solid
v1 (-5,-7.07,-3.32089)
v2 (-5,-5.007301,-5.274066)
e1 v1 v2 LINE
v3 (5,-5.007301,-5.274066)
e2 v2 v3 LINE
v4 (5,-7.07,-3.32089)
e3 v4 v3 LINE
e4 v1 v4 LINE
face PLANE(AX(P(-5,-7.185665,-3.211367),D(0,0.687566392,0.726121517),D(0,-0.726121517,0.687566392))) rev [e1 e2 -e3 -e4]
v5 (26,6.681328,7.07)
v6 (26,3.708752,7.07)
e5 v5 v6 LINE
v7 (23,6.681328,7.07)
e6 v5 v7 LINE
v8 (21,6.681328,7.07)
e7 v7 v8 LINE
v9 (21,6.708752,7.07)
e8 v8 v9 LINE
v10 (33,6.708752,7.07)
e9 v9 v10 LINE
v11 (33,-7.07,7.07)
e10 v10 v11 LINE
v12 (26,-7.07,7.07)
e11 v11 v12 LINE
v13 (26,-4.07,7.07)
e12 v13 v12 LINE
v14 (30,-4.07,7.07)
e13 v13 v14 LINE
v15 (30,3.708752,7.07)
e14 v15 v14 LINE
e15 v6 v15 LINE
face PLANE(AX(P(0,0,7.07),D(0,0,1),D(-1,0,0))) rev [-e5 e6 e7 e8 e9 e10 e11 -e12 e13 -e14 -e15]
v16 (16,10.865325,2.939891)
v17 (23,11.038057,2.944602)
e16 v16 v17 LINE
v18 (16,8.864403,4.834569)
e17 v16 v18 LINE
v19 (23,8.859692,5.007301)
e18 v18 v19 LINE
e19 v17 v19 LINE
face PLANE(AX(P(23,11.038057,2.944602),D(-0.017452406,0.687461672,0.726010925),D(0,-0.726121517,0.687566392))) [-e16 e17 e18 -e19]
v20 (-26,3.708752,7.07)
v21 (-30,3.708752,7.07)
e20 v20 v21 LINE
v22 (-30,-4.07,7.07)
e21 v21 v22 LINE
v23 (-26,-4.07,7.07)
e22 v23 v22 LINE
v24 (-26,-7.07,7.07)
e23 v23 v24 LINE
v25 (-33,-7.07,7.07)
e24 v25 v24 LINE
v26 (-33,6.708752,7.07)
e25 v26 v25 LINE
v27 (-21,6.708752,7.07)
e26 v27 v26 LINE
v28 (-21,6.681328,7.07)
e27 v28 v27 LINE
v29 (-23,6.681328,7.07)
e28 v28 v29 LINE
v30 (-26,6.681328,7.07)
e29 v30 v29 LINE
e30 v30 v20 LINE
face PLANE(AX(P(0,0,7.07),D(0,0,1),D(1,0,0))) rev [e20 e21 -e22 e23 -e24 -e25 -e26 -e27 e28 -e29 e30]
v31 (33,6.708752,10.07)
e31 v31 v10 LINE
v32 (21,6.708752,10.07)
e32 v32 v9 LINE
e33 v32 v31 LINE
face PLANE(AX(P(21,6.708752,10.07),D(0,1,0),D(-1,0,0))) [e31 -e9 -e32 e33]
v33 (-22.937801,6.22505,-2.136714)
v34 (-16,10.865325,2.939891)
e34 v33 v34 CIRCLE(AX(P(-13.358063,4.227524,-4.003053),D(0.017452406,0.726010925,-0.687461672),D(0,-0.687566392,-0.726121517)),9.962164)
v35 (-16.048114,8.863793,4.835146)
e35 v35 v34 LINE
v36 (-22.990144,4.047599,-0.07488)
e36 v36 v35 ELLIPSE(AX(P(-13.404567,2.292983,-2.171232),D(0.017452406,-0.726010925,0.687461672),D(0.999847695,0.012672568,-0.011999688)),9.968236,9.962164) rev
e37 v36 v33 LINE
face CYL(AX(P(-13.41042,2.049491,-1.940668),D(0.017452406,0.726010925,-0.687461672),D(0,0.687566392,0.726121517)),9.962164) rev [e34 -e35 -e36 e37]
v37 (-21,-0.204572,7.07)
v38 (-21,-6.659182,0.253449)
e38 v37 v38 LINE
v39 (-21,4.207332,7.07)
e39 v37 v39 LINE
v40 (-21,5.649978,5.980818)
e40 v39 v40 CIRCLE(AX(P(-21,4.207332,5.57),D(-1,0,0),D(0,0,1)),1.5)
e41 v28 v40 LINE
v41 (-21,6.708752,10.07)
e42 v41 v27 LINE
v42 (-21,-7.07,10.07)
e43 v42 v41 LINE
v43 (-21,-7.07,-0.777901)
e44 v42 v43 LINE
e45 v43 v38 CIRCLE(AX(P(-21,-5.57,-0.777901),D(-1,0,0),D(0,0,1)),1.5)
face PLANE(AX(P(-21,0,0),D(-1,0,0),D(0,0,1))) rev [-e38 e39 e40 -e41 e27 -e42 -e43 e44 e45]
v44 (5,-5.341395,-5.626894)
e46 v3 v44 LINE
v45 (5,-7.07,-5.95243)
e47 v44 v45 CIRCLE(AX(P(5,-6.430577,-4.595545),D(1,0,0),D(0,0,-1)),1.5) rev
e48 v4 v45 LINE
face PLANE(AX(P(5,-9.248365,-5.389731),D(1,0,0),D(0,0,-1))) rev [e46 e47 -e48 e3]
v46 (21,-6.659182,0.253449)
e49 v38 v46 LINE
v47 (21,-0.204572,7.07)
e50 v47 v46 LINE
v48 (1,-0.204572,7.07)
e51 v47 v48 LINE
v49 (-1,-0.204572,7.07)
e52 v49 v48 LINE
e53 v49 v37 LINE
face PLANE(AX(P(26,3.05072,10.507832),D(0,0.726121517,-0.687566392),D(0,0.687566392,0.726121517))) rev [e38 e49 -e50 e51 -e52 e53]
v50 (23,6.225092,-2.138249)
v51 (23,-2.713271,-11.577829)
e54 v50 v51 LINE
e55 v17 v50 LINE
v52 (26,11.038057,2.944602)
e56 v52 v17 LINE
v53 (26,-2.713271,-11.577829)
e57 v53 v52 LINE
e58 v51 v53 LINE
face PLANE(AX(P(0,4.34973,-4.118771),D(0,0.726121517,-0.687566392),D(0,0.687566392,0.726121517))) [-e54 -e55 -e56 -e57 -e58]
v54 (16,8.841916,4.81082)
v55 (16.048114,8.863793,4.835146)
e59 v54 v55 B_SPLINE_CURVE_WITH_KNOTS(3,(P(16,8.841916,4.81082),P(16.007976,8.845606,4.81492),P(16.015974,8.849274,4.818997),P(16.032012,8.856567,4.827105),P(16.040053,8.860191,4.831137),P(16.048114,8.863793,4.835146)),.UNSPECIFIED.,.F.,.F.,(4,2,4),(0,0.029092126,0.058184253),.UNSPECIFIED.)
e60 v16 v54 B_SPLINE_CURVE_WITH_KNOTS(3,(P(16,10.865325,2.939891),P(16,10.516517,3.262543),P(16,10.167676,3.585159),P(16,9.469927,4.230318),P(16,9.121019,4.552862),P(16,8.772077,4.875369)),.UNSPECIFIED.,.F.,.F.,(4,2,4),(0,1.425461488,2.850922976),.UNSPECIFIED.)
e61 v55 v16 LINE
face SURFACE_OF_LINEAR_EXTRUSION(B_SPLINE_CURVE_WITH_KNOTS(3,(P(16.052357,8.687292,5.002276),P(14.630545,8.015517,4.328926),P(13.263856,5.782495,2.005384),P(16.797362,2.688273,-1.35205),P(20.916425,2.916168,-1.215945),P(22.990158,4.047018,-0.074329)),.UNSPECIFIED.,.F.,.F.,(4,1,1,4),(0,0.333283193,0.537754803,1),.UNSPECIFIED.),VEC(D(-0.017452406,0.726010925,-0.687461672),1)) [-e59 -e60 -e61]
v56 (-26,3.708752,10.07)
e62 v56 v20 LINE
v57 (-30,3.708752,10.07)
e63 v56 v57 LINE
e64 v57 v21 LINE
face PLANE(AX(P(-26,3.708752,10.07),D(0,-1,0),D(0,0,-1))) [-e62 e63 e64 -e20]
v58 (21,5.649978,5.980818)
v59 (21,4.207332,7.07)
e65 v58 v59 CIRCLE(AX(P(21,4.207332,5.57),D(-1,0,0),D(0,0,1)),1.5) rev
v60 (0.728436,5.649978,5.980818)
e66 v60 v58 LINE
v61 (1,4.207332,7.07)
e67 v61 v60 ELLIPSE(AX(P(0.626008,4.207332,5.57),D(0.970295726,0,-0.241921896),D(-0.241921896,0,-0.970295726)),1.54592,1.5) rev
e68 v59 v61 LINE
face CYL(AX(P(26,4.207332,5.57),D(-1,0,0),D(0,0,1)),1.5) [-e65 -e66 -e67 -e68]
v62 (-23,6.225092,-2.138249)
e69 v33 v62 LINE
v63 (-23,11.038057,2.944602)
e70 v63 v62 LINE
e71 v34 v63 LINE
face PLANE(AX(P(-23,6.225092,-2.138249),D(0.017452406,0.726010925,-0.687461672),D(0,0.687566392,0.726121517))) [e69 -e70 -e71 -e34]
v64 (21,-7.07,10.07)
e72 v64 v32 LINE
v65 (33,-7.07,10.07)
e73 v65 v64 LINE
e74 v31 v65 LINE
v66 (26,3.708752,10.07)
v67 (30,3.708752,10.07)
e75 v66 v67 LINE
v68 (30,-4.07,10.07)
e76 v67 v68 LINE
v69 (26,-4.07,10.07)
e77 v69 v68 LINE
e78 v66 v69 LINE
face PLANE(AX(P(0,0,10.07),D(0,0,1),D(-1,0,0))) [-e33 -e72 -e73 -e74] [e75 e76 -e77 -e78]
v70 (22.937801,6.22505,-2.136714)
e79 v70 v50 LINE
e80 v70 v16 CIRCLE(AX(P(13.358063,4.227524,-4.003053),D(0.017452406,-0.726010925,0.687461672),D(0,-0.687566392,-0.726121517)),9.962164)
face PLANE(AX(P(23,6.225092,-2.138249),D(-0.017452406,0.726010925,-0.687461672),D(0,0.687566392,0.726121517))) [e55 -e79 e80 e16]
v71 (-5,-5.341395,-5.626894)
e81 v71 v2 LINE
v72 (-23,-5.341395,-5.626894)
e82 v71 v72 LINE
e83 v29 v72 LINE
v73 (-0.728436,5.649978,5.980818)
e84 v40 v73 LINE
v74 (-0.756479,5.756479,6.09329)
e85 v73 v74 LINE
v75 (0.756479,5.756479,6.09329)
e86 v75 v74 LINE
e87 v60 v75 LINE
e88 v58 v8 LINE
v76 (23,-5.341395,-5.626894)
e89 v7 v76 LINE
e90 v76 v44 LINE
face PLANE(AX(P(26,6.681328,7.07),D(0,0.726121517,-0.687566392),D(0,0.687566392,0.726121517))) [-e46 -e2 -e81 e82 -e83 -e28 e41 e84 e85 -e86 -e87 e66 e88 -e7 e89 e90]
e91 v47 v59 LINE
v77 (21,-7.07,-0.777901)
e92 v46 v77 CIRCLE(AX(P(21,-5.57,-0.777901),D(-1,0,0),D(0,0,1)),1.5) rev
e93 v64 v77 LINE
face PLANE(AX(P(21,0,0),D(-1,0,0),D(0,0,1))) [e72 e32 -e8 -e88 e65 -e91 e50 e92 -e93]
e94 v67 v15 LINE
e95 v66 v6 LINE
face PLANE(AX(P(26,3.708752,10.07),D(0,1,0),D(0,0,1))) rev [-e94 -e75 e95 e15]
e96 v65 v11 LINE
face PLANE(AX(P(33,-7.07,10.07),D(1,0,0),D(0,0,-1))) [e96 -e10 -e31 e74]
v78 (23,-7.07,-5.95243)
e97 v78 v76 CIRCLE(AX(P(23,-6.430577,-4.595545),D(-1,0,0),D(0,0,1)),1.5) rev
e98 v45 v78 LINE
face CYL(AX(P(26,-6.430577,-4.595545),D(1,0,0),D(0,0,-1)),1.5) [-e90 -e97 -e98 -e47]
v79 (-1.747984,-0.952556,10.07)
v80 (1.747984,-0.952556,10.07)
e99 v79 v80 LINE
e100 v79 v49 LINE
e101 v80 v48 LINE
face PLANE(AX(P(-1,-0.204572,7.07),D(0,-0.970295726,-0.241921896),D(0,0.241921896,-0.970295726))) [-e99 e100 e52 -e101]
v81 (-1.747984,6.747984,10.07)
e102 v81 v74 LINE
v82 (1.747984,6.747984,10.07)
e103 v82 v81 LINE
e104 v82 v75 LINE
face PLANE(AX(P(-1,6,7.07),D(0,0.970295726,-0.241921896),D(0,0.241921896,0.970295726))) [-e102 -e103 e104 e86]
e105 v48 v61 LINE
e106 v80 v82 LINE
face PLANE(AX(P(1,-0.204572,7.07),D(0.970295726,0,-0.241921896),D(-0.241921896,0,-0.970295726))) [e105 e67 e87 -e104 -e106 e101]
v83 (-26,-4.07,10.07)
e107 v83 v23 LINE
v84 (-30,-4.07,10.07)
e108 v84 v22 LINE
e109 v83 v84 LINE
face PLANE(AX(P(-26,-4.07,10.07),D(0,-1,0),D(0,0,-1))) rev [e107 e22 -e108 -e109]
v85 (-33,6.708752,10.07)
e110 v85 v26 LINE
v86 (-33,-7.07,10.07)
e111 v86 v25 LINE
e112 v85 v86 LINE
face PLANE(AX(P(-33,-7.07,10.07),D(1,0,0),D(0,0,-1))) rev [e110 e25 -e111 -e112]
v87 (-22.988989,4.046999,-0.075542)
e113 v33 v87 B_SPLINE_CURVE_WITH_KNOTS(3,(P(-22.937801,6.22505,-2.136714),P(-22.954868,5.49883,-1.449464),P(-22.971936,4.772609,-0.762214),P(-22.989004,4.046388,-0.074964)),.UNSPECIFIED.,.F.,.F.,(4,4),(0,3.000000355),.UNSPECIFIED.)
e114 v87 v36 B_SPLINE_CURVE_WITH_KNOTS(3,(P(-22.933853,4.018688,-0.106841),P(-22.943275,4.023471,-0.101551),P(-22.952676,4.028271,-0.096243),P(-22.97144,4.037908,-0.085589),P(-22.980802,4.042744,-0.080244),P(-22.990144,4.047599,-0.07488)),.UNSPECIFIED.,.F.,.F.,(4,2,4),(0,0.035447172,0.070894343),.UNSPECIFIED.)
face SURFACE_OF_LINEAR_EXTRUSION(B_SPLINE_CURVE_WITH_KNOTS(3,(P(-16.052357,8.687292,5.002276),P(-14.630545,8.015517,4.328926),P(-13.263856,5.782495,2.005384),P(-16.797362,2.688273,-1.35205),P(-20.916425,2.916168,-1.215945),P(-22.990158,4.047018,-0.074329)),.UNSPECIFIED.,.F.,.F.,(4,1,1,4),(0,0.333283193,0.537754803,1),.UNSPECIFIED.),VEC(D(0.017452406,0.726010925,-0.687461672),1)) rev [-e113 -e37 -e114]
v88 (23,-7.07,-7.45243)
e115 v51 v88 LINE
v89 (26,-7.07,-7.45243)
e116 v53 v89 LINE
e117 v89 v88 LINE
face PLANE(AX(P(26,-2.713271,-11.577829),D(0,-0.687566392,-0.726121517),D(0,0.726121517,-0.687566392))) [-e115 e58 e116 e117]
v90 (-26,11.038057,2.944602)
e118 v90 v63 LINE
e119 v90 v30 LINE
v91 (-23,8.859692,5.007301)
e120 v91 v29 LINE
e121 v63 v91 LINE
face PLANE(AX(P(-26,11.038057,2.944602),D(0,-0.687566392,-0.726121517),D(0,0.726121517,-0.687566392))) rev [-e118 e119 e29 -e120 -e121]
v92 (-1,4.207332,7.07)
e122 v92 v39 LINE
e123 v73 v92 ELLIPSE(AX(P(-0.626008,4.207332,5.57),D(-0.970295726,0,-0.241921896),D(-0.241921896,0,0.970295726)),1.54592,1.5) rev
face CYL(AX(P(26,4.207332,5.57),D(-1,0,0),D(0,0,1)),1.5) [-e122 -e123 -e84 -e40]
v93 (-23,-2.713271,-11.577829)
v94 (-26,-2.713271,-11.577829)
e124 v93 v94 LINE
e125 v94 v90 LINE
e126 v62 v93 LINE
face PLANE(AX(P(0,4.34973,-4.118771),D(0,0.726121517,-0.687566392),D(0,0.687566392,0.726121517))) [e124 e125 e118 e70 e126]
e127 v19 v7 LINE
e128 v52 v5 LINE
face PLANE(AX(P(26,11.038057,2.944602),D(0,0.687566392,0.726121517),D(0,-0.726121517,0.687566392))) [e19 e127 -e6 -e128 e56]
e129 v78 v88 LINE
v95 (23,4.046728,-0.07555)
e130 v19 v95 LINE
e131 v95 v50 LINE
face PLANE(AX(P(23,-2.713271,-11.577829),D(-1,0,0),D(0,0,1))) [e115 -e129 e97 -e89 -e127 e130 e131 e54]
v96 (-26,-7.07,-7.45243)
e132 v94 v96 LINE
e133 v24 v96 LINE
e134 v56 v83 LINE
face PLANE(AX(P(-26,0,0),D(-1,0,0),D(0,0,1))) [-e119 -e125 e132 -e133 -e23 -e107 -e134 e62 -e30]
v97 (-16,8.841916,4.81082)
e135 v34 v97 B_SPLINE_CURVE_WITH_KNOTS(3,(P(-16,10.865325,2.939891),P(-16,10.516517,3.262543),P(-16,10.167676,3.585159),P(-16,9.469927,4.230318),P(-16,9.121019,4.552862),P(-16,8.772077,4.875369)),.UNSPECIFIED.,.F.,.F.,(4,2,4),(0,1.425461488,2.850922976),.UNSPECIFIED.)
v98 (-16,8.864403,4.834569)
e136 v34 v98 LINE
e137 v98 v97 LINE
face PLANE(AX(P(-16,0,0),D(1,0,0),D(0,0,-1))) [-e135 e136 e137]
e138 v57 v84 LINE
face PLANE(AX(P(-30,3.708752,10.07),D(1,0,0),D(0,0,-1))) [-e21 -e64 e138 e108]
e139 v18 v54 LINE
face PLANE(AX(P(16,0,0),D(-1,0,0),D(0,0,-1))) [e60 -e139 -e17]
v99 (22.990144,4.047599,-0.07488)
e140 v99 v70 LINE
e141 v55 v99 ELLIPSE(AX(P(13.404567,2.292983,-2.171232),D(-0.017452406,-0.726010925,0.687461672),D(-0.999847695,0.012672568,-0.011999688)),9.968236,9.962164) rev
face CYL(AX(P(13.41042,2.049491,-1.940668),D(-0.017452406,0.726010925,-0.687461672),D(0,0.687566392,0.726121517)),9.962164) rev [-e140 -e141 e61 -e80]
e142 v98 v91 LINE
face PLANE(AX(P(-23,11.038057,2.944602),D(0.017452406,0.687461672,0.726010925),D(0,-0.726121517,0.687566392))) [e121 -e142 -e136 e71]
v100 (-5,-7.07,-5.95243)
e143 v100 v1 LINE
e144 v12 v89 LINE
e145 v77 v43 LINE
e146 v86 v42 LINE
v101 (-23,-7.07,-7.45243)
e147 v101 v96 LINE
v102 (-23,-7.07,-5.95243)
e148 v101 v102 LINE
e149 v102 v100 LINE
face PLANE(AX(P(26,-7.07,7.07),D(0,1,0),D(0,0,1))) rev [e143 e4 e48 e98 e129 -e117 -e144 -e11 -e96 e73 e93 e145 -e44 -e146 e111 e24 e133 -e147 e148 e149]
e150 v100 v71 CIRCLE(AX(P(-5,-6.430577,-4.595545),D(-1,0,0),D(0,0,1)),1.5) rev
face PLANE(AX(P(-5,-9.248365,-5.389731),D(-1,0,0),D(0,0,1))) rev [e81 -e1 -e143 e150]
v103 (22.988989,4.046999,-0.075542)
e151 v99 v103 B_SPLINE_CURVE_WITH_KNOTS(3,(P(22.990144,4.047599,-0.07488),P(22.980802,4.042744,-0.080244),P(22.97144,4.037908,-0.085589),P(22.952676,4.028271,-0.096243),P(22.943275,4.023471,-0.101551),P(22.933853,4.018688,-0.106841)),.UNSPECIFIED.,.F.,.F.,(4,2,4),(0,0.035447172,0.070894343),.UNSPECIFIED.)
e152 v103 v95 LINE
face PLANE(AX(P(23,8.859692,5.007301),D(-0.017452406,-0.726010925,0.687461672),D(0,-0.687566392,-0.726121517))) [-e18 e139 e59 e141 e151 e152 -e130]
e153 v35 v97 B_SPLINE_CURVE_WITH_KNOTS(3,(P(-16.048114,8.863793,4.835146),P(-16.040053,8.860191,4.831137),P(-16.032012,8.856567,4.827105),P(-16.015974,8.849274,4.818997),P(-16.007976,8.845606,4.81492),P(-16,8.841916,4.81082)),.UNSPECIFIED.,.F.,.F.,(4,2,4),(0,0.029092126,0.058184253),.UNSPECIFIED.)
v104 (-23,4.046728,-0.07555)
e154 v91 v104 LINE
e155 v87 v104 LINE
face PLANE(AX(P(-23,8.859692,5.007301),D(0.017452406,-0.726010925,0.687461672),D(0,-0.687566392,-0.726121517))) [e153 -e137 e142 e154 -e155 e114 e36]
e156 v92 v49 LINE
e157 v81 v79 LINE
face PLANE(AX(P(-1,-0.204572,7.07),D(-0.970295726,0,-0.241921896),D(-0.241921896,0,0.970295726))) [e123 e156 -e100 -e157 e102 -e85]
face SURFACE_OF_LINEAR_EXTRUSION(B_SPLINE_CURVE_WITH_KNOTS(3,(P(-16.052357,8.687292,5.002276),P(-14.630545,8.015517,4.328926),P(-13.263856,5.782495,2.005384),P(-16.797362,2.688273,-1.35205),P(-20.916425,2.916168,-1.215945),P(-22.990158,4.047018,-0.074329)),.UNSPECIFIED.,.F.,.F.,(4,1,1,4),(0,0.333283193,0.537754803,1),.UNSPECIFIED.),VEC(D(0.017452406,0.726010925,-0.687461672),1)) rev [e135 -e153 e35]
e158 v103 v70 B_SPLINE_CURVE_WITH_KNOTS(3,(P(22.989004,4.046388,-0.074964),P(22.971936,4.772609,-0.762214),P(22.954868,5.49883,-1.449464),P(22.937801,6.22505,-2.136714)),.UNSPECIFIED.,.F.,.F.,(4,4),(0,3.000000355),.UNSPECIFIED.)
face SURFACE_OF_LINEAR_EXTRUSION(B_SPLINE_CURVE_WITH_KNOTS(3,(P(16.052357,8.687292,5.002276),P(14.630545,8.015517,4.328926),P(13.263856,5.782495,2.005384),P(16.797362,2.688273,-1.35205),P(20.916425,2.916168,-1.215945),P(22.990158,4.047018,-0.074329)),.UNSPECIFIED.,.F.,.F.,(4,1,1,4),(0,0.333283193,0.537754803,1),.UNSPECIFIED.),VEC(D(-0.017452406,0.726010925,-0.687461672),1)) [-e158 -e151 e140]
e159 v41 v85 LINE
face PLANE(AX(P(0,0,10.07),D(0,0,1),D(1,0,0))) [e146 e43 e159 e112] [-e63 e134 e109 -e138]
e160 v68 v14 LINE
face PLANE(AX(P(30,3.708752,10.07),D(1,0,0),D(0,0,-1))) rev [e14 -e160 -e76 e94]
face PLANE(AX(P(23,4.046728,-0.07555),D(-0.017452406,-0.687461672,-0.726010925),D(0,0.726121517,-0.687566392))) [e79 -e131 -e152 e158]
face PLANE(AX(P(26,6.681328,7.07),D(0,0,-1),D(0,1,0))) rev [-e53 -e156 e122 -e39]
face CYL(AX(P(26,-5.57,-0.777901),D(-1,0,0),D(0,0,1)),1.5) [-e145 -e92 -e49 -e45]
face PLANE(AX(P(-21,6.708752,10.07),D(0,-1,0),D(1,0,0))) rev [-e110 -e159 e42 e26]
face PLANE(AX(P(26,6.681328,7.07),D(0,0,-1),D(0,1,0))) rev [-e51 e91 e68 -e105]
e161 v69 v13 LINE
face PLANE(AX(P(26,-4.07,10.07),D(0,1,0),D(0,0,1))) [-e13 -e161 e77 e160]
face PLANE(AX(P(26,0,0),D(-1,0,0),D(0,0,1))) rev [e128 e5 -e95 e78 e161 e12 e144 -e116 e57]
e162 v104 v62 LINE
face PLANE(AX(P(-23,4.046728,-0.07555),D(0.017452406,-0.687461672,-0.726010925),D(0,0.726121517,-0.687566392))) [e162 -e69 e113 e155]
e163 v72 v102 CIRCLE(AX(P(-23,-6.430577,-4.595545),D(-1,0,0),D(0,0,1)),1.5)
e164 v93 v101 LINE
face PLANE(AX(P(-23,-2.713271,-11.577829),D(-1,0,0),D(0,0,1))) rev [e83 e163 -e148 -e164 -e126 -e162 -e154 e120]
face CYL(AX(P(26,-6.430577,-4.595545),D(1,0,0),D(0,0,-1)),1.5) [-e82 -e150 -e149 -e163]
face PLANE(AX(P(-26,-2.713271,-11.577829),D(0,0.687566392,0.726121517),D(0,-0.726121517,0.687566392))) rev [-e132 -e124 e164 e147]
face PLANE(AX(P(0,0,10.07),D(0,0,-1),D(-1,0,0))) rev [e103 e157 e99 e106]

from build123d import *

# Parameters (mm, degrees)
BOSS_EXTRUDE2_DEPTH     = 26
SHELL3_T                = -5
SKETCH2_W               = 3
SKETCH2_H               = 20
BOSS_EXTRUDE3_DEPTH     = 6
BOSS_EXTRUDE4_DEPTH     = 7
BOSS_EXTRUDE4_TAPER     = 1
BOSS_EXTRUDE5_START     = -7.07
BOSS_EXTRUDE5_OUTLINE_W = 12
BOSS_EXTRUDE5_OUTLINE_H = 3
BOSS_EXTRUDE5_DEPTH     = 13.778752476
SKETCH7_W               = 4
SKETCH7_H               = 7.778752476
CUT_EXTRUDE1_DEPTH      = 3
CUT_EXTRUDE5_DEPTH      = 3
SKETCH8_W               = 2
SKETCH8_H               = 6.204571956
BOSS_EXTRUDE6_DEPTH     = 3
BOSS_EXTRUDE6_DRAFT     = -14
SKETCH10_W              = 10
SKETCH10_H              = 3
CUT_EXTRUDE2_DEPTH      = 3
CHAMFER2_SIZE           = 1.5
CHAMFER2_SIZE_2         = 1.061054559
FILLET7_R               = 1.5


# Read off the part's stored shape, not the designer's step: Boss-Extrude5
with BuildPart() as part:
    # Sketch1 → Boss-Extrude2 (new, symmetric)
    with BuildSketch(Plane(origin=(0, 0, 0), x_dir=(0, 0, -1), z_dir=(1, 0, 0))):
        Polygon((-7.07, 6.681327836), (-7.07, -7.07), (7.452430332, -7.07), align=None)
    extrude(amount=BOSS_EXTRUDE2_DEPTH, both=True)

    # Shell3
    shell3_openings = [part.faces().sort_by_distance(p)[0] for p in [
        (0, -0.194336082, 7.07),
        (0, -7.07, -0.191215166),
    ]]
    offset(amount=SHELL3_T, openings=shell3_openings, kind=Kind.INTERSECTION)

    # Sketch2 → Boss-Extrude3 (add)
    with BuildSketch(Plane(origin=(0, -0.006998714, 0.006627101), x_dir=(1, 0, 0), z_dir=(0, 0.7261215165867746, -0.6875663918122543))):
        with Locations((-24.5, 0.272464405)):
            Rectangle(SKETCH2_W, SKETCH2_H)
    boss_extrude3 = extrude(amount=BOSS_EXTRUDE3_DEPTH)

    # Sketch3 → Boss-Extrude4 (add)
    with BuildSketch(Plane(origin=(-23, 0, 0), x_dir=(0, 0, -1), z_dir=(1, 0, 0))):
        Polygon((-5.007300825, 8.859692386), (0.075549792, 4.046727643), (2.138248967, 6.225092193), (-2.944601649, 11.038056936), align=None)
    boss_extrude4 = extrude(amount=BOSS_EXTRUDE4_DEPTH, taper=BOSS_EXTRUDE4_TAPER)

    # Boss-Extrude5 outline → Boss-Extrude5 (add)
    with BuildSketch(Plane(origin=(0, 0, 0), x_dir=(1, 0, 0), z_dir=(0, 1, 0)).offset(BOSS_EXTRUDE5_START)):
        with Locations((-27, -8.57)):
            Rectangle(BOSS_EXTRUDE5_OUTLINE_W, BOSS_EXTRUDE5_OUTLINE_H)
    boss_extrude5 = extrude(amount=BOSS_EXTRUDE5_DEPTH)

    # Sketch7 → Cut-Extrude1 (cut)
    with BuildSketch(Plane(origin=(0, 0, 7.07), x_dir=(-1, 0, 0), z_dir=(0, 0, -1))):
        with Locations((28, -0.180623762)):
            Rectangle(SKETCH7_W, SKETCH7_H)
    cut_extrude1 = extrude(amount=-CUT_EXTRUDE1_DEPTH, mode=Mode.SUBTRACT)

    # Sketch11 → Cut-Extrude5 (cut)
    with BuildSketch(Plane(origin=(0.097524812, 4.056980848, -3.841565936), x_dir=(0.9998476951563913, -0.012672567830329124, 0.011999688122524015), z_dir=(0.017452406437283557, 0.72601092476275, -0.6874616721204788))):
        with BuildLine():
            ThreePointArc((-16.099976916, -9.605350141), (-20.470201884, -7.075920319), (-23.038834329, -2.72862129))
            add(Edge.make_bspline(
                [(-23.038834329, -2.72862129), (-20.964785252, -1.12213519), (-16.845095332, -0.866613762), (-13.311050846, -5.432002143), (-14.677947992, -8.654526842), (-16.099976916, -9.605350141)],
                knots=[0, 0, 0, 0, 0.462245197, 0.666716807, 1, 1, 1, 1], degree=3))
        make_face()
    cut_extrude5 = extrude(amount=-CUT_EXTRUDE5_DEPTH, mode=Mode.SUBTRACT)

    # Mirror4: Boss-Extrude3, Boss-Extrude4, Boss-Extrude5, Cut-Extrude1, Cut-Extrude5 across plane
    add(boss_extrude3.mirror(Plane(origin=(0, 0, 0), x_dir=(0, 0, 1), z_dir=(1, 0, 0))))
    add(boss_extrude4.mirror(Plane(origin=(0, 0, 0), x_dir=(0, 0, 1), z_dir=(1, 0, 0))))
    add(boss_extrude5.mirror(Plane(origin=(0, 0, 0), x_dir=(0, 0, 1), z_dir=(1, 0, 0))))
    add(cut_extrude1.mirror(Plane(origin=(0, 0, 0), x_dir=(0, 0, 1), z_dir=(1, 0, 0))), mode=Mode.SUBTRACT)
    add(cut_extrude5.mirror(Plane(origin=(0, 0, 0), x_dir=(0, 0, 1), z_dir=(1, 0, 0))), mode=Mode.SUBTRACT)


with BuildPart() as boss_extrude6_tool:
    # Sketch8 → Boss-Extrude6 (with draft: the straight prism first)
    with BuildSketch(Plane.XY.offset(7.07)):
        with Locations((0, 2.897714022)):
            Rectangle(SKETCH8_W, SKETCH8_H)
    extrude(amount=BOSS_EXTRUDE6_DEPTH)
    # Boss-Extrude6: the draft: its side faces are tilted about the plane it starts from
    boss_extrude6_sides = [boss_extrude6_tool.faces().sort_by_distance(p)[0] for p in [
        (0, -0.204571956, 8.57),
        (1, 2.897714022, 8.57),
        (0, 6, 8.57),
        (-1, 2.897714022, 8.57),
    ]]
    draft(boss_extrude6_sides, Plane.XY.offset(7.07), BOSS_EXTRUDE6_DRAFT)


with BuildPart() as part_1:
    add(part.part)

    # Boss-Extrude6: add boss_extrude6_tool
    add(boss_extrude6_tool.part)

    # Sketch10 → Cut-Extrude2 (cut)
    with BuildSketch(Plane(origin=(0, -0.006998714, 0.006627101), x_dir=(1, 0, 0), z_dir=(0, 0.7261215165867746, -0.6875663918122543))):
        with Locations((0, 8.772464405)):
            Rectangle(SKETCH10_W, SKETCH10_H)
    extrude(amount=-CUT_EXTRUDE2_DEPTH, mode=Mode.SUBTRACT)

    # Chamfer2
    # the kernel refuses this chamfer: 1.5, 1.061054559 mm, written as the material it takes off along each edge
    with BuildSketch(Plane(origin=(21, 6.681327836, 7.07), x_dir=(0, -0.6673410869627874, -0.7447522229918655), z_dir=(-1, 0, 0))) as chamfer2_piece_1_section:
        Polygon((CHAMFER2_SIZE * 0.999621916911, CHAMFER2_SIZE * 0.0274958766106), (CHAMFER2_SIZE_2 * 0.667341086869, CHAMFER2_SIZE_2 * 0.744752222888), (0, 0), align=None)
    chamfer2_piece_1 = extrude(amount=45.857524482, mode=Mode.PRIVATE)
    chamfer2_piece_1 = split(chamfer2_piece_1, bisect_by=Plane(origin=(1.484835195, 5.763736447, 9.014567757), z_dir=(0.9702957262759965, 0, -0.24192189559966784)), keep=Keep.TOP, mode=Mode.PRIVATE)
    add(chamfer2_piece_1, mode=Mode.SUBTRACT)
    with BuildSketch(Plane(origin=(24.857524482, 6.681327836, 7.07), x_dir=(0, -0.6673410869627874, -0.7447522229918655), z_dir=(-1, 0, 0))) as chamfer2_piece_2_section:
        Polygon((CHAMFER2_SIZE * 0.999621916911, CHAMFER2_SIZE * 0.0274958766106), (CHAMFER2_SIZE_2 * 0.667341086869, CHAMFER2_SIZE_2 * 0.744752222888), (0, 0), align=None)
    chamfer2_piece_2 = extrude(amount=45.857524482, mode=Mode.PRIVATE)
    chamfer2_piece_2 = split(chamfer2_piece_2, bisect_by=Plane(origin=(-1.484835195, 5.763736447, 9.014567757), z_dir=(-0.9702957262759965, 0, -0.24192189559966784)), keep=Keep.TOP, mode=Mode.PRIVATE)
    add(chamfer2_piece_2, mode=Mode.SUBTRACT)
    with BuildSketch(Plane(origin=(24.857524482, 6.681327836, 7.07), x_dir=(0, -0.6673410869627874, -0.7447522229918655), z_dir=(-1, 0, 0))) as chamfer2_piece_3_section:
        Polygon((CHAMFER2_SIZE * 0.999621916911, CHAMFER2_SIZE * 0.0274958766106), (CHAMFER2_SIZE_2 * 0.667341086869, CHAMFER2_SIZE_2 * 0.744752222888), (0, 0), align=None)
    chamfer2_piece_3 = extrude(amount=49.715048964, mode=Mode.PRIVATE)
    chamfer2_piece_3 = split(chamfer2_piece_3, bisect_by=Plane(origin=(0.868426691, 6.154537231, 6.542288281), z_dir=(-0.9702957262759965, 0, 0.24192189559966784)), keep=Keep.TOP, mode=Mode.PRIVATE)
    chamfer2_piece_3 = split(chamfer2_piece_3, bisect_by=Plane(origin=(0, 5.935997372, 6.81329948), z_dir=(0, 0.9702957262759965, -0.24192189559966784)), keep=Keep.TOP, mode=Mode.PRIVATE)
    chamfer2_piece_3 = split(chamfer2_piece_3, bisect_by=Plane(origin=(-0.868426691, 6.154537231, 6.542288281), z_dir=(0.9702957262759965, 0, 0.24192189559966784)), keep=Keep.TOP, mode=Mode.PRIVATE)
    add(chamfer2_piece_3, mode=Mode.SUBTRACT)
    with BuildSketch(Plane(origin=(23, -7.07, -7.452430332), x_dir=(0, 0.7275099269437866, 0.6860971550722583), z_dir=(-1, 0, 0)), Plane(origin=(-1.142475518, -7.07, -7.452430332), x_dir=(0, 0.7275099269437866, 0.6860971550722583), z_dir=(-1, 0, 0))) as chamfer2_piece_4:
        Polygon((CHAMFER2_SIZE_2 * 0.998401282104, -CHAMFER2_SIZE_2 * 0.0565232661308), (CHAMFER2_SIZE * 0.686097155072, -CHAMFER2_SIZE * 0.727509926944), (0, 0), align=None)
    extrude(amount=21.857524482, mode=Mode.SUBTRACT)

    # Fillet7
    # the kernel refuses this fillet: 1.5 mm, written as the material it takes off along each edge
    with BuildSketch(Plane(origin=(21, 5.620273277, 7.07), x_dir=(0, 0.02726259017777431, -0.9996283065103743), z_dir=(-1, 0, 0))) as fillet7_piece_1_section:
        with BuildLine():
            CenterArc((1.460922015, 1.453310189), FILLET7_R, 181.562224917, 74.10480975)
            Line((-0.038520445, 1.412416304), (-0.068509294, 1.411598426))
            Line((-0.068509294, 1.411598426), (-0.029988849, -0.000817878))
            Line((-0.029988849, -0.000817878), (0, -0.03))
            ThreePointArc((0, -0.03), (0.544793634, -0.03), (1.082160572, -0.029066204))
            Line((1.082160572, -0.029066204), (1.089587267, 0))
        make_face()
    fillet7_piece_1 = extrude(amount=23.532353712, mode=Mode.PRIVATE)
    fillet7_piece_1 = split(fillet7_piece_1, bisect_by=Plane(origin=(1.518643203, 5.295979724, 9.15016427), z_dir=(0.9702957262759188, 0, -0.24192189559997973)), keep=Keep.TOP, mode=Mode.PRIVATE)
    add(fillet7_piece_1, mode=Mode.SUBTRACT)
    with BuildSketch(Plane(origin=(21, 5.620273277, 7.07), x_dir=(0, 0.02726259017777431, -0.9996283065103743), z_dir=(-1, 0, 0))) as fillet7_piece_2_section:
        with BuildLine():
            CenterArc((1.460922015, 1.453310189), FILLET7_R, 181.562224917, 74.10480975)
            Line((-0.038520445, 1.412416304), (-0.068509294, 1.411598426))
            Line((-0.068509294, 1.411598426), (-0.029988849, -0.000817878))
            Line((-0.029988849, -0.000817878), (0, -0.03))
            ThreePointArc((0, -0.03), (0.544793634, -0.03), (1.082160572, -0.029066204))
            Line((1.082160572, -0.029066204), (1.089587267, 0))
        make_face()
    fillet7_piece_2 = extrude(amount=23.532353712, mode=Mode.PRIVATE)
    fillet7_piece_2 = split(fillet7_piece_2, bisect_by=Plane(origin=(-0.975981109, 5.302873869, 6.97366549), z_dir=(-0.9702957262759188, 0, -0.24192189559997973)), keep=Keep.TOP, mode=Mode.PRIVATE)
    add(fillet7_piece_2, mode=Mode.SUBTRACT)
    with BuildSketch(Plane(origin=(2.532353712, 5.620273277, 7.07), x_dir=(0, 0.02726259017777401, -0.9996283065103743), z_dir=(-1, 0, 0))) as fillet7_piece_3_section:
        with BuildLine():
            CenterArc((1.460922015, 1.453310189), FILLET7_R, 181.562224917, 74.10480975)
            Line((-0.038520445, 1.412416304), (-0.068509294, 1.411598426))
            Line((-0.068509294, 1.411598426), (-0.029988849, -0.000817878))
            Line((-0.029988849, -0.000817878), (0, -0.03))
            ThreePointArc((0, -0.03), (0.544793634, -0.03), (1.082160572, -0.029066204))
            Line((1.082160572, -0.029066204), (1.089587267, 0))
        make_face()
    fillet7_piece_3 = extrude(amount=23.532353712, mode=Mode.PRIVATE)
    fillet7_piece_3 = split(fillet7_piece_3, bisect_by=Plane(origin=(0.975981109, 5.302873869, 6.97366549), z_dir=(0.9702957262759188, 0, -0.24192189559997973)), keep=Keep.TOP, mode=Mode.PRIVATE)
    add(fillet7_piece_3, mode=Mode.SUBTRACT)
    with BuildSketch(Plane(origin=(2.532353712, 5.620273277, 7.07), x_dir=(0, 0.02726259017777401, -0.9996283065103743), z_dir=(-1, 0, 0))) as fillet7_piece_4_section:
        with BuildLine():
            CenterArc((1.460922015, 1.453310189), FILLET7_R, 181.562224917, 74.10480975)
            Line((-0.038520445, 1.412416304), (-0.068509294, 1.411598426))
            Line((-0.068509294, 1.411598426), (-0.029988849, -0.000817878))
            Line((-0.029988849, -0.000817878), (0, -0.03))
            ThreePointArc((0, -0.03), (0.544793634, -0.03), (1.082160572, -0.029066204))
            Line((1.082160572, -0.029066204), (1.089587267, 0))
        make_face()
    fillet7_piece_4 = extrude(amount=23.532353712, mode=Mode.PRIVATE)
    fillet7_piece_4 = split(fillet7_piece_4, bisect_by=Plane(origin=(-1.518643203, 5.295979724, 9.15016427), z_dir=(-0.9702957262759188, 0, -0.24192189559997973)), keep=Keep.TOP, mode=Mode.PRIVATE)
    add(fillet7_piece_4, mode=Mode.SUBTRACT)
    with BuildSketch(Plane(origin=(-21, -7.07, -0.180405318), x_dir=(0, 0, -1), z_dir=(1, 0, 0))) as fillet7_piece_5:
        with BuildLine():
            CenterArc((FILLET7_R * 0.398330236432, FILLET7_R), FILLET7_R, 226.562224917, 43.437775083)
            Line((-FILLET7_R * 0.28923615538, FILLET7_R * 0.273878483413), (-FILLET7_R * 0.302987483217, FILLET7_R * 0.259356053081))
            Line((-FILLET7_R * 0.302987483217, FILLET7_R * 0.259356053081), (-FILLET7_R * 0.00796660472864, -FILLET7_R * 0.02))
            Line((-FILLET7_R * 0.00796660472864, -FILLET7_R * 0.02), (FILLET7_R * 0.398330236432, -FILLET7_R * 0.02))
            Line((FILLET7_R * 0.398330236432, -FILLET7_R * 0.02), (FILLET7_R * 0.398330236432, 0))
        make_face()
    extrude(amount=42, mode=Mode.SUBTRACT)
    with BuildSketch(Plane(origin=(23, -6.340454545, -6.681975786), x_dir=(0, 0.6875663918122538, 0.7261215165867753), z_dir=(-1, 0, 0)), Plane(origin=(-1.367407216, -6.340454545, -6.681975786), x_dir=(0, 0.6875663918122543, 0.7261215165867746), z_dir=(-1, 0, 0))) as fillet7_piece_6:
        with BuildLine():
            CenterArc((1.453037114, -1.5), FILLET7_R, 90, 71.794047616)
            Line((0.028127716, -1.031349588), (-0.000370472, -1.021976579))
            ThreePointArc((-0.000370472, -1.021976579), (-0.015924991, -0.516492672), (-0.029988849, -0.000817878))
            Line((-0.029988849, -0.000817878), (0, 0.03))
            Line((0, 0.03), (1.453037114, 0.03))
            Line((1.453037114, 0.03), (1.453037114, 0))
        make_face()
    extrude(amount=21.632592784, mode=Mode.SUBTRACT)


solid = part_1.part
